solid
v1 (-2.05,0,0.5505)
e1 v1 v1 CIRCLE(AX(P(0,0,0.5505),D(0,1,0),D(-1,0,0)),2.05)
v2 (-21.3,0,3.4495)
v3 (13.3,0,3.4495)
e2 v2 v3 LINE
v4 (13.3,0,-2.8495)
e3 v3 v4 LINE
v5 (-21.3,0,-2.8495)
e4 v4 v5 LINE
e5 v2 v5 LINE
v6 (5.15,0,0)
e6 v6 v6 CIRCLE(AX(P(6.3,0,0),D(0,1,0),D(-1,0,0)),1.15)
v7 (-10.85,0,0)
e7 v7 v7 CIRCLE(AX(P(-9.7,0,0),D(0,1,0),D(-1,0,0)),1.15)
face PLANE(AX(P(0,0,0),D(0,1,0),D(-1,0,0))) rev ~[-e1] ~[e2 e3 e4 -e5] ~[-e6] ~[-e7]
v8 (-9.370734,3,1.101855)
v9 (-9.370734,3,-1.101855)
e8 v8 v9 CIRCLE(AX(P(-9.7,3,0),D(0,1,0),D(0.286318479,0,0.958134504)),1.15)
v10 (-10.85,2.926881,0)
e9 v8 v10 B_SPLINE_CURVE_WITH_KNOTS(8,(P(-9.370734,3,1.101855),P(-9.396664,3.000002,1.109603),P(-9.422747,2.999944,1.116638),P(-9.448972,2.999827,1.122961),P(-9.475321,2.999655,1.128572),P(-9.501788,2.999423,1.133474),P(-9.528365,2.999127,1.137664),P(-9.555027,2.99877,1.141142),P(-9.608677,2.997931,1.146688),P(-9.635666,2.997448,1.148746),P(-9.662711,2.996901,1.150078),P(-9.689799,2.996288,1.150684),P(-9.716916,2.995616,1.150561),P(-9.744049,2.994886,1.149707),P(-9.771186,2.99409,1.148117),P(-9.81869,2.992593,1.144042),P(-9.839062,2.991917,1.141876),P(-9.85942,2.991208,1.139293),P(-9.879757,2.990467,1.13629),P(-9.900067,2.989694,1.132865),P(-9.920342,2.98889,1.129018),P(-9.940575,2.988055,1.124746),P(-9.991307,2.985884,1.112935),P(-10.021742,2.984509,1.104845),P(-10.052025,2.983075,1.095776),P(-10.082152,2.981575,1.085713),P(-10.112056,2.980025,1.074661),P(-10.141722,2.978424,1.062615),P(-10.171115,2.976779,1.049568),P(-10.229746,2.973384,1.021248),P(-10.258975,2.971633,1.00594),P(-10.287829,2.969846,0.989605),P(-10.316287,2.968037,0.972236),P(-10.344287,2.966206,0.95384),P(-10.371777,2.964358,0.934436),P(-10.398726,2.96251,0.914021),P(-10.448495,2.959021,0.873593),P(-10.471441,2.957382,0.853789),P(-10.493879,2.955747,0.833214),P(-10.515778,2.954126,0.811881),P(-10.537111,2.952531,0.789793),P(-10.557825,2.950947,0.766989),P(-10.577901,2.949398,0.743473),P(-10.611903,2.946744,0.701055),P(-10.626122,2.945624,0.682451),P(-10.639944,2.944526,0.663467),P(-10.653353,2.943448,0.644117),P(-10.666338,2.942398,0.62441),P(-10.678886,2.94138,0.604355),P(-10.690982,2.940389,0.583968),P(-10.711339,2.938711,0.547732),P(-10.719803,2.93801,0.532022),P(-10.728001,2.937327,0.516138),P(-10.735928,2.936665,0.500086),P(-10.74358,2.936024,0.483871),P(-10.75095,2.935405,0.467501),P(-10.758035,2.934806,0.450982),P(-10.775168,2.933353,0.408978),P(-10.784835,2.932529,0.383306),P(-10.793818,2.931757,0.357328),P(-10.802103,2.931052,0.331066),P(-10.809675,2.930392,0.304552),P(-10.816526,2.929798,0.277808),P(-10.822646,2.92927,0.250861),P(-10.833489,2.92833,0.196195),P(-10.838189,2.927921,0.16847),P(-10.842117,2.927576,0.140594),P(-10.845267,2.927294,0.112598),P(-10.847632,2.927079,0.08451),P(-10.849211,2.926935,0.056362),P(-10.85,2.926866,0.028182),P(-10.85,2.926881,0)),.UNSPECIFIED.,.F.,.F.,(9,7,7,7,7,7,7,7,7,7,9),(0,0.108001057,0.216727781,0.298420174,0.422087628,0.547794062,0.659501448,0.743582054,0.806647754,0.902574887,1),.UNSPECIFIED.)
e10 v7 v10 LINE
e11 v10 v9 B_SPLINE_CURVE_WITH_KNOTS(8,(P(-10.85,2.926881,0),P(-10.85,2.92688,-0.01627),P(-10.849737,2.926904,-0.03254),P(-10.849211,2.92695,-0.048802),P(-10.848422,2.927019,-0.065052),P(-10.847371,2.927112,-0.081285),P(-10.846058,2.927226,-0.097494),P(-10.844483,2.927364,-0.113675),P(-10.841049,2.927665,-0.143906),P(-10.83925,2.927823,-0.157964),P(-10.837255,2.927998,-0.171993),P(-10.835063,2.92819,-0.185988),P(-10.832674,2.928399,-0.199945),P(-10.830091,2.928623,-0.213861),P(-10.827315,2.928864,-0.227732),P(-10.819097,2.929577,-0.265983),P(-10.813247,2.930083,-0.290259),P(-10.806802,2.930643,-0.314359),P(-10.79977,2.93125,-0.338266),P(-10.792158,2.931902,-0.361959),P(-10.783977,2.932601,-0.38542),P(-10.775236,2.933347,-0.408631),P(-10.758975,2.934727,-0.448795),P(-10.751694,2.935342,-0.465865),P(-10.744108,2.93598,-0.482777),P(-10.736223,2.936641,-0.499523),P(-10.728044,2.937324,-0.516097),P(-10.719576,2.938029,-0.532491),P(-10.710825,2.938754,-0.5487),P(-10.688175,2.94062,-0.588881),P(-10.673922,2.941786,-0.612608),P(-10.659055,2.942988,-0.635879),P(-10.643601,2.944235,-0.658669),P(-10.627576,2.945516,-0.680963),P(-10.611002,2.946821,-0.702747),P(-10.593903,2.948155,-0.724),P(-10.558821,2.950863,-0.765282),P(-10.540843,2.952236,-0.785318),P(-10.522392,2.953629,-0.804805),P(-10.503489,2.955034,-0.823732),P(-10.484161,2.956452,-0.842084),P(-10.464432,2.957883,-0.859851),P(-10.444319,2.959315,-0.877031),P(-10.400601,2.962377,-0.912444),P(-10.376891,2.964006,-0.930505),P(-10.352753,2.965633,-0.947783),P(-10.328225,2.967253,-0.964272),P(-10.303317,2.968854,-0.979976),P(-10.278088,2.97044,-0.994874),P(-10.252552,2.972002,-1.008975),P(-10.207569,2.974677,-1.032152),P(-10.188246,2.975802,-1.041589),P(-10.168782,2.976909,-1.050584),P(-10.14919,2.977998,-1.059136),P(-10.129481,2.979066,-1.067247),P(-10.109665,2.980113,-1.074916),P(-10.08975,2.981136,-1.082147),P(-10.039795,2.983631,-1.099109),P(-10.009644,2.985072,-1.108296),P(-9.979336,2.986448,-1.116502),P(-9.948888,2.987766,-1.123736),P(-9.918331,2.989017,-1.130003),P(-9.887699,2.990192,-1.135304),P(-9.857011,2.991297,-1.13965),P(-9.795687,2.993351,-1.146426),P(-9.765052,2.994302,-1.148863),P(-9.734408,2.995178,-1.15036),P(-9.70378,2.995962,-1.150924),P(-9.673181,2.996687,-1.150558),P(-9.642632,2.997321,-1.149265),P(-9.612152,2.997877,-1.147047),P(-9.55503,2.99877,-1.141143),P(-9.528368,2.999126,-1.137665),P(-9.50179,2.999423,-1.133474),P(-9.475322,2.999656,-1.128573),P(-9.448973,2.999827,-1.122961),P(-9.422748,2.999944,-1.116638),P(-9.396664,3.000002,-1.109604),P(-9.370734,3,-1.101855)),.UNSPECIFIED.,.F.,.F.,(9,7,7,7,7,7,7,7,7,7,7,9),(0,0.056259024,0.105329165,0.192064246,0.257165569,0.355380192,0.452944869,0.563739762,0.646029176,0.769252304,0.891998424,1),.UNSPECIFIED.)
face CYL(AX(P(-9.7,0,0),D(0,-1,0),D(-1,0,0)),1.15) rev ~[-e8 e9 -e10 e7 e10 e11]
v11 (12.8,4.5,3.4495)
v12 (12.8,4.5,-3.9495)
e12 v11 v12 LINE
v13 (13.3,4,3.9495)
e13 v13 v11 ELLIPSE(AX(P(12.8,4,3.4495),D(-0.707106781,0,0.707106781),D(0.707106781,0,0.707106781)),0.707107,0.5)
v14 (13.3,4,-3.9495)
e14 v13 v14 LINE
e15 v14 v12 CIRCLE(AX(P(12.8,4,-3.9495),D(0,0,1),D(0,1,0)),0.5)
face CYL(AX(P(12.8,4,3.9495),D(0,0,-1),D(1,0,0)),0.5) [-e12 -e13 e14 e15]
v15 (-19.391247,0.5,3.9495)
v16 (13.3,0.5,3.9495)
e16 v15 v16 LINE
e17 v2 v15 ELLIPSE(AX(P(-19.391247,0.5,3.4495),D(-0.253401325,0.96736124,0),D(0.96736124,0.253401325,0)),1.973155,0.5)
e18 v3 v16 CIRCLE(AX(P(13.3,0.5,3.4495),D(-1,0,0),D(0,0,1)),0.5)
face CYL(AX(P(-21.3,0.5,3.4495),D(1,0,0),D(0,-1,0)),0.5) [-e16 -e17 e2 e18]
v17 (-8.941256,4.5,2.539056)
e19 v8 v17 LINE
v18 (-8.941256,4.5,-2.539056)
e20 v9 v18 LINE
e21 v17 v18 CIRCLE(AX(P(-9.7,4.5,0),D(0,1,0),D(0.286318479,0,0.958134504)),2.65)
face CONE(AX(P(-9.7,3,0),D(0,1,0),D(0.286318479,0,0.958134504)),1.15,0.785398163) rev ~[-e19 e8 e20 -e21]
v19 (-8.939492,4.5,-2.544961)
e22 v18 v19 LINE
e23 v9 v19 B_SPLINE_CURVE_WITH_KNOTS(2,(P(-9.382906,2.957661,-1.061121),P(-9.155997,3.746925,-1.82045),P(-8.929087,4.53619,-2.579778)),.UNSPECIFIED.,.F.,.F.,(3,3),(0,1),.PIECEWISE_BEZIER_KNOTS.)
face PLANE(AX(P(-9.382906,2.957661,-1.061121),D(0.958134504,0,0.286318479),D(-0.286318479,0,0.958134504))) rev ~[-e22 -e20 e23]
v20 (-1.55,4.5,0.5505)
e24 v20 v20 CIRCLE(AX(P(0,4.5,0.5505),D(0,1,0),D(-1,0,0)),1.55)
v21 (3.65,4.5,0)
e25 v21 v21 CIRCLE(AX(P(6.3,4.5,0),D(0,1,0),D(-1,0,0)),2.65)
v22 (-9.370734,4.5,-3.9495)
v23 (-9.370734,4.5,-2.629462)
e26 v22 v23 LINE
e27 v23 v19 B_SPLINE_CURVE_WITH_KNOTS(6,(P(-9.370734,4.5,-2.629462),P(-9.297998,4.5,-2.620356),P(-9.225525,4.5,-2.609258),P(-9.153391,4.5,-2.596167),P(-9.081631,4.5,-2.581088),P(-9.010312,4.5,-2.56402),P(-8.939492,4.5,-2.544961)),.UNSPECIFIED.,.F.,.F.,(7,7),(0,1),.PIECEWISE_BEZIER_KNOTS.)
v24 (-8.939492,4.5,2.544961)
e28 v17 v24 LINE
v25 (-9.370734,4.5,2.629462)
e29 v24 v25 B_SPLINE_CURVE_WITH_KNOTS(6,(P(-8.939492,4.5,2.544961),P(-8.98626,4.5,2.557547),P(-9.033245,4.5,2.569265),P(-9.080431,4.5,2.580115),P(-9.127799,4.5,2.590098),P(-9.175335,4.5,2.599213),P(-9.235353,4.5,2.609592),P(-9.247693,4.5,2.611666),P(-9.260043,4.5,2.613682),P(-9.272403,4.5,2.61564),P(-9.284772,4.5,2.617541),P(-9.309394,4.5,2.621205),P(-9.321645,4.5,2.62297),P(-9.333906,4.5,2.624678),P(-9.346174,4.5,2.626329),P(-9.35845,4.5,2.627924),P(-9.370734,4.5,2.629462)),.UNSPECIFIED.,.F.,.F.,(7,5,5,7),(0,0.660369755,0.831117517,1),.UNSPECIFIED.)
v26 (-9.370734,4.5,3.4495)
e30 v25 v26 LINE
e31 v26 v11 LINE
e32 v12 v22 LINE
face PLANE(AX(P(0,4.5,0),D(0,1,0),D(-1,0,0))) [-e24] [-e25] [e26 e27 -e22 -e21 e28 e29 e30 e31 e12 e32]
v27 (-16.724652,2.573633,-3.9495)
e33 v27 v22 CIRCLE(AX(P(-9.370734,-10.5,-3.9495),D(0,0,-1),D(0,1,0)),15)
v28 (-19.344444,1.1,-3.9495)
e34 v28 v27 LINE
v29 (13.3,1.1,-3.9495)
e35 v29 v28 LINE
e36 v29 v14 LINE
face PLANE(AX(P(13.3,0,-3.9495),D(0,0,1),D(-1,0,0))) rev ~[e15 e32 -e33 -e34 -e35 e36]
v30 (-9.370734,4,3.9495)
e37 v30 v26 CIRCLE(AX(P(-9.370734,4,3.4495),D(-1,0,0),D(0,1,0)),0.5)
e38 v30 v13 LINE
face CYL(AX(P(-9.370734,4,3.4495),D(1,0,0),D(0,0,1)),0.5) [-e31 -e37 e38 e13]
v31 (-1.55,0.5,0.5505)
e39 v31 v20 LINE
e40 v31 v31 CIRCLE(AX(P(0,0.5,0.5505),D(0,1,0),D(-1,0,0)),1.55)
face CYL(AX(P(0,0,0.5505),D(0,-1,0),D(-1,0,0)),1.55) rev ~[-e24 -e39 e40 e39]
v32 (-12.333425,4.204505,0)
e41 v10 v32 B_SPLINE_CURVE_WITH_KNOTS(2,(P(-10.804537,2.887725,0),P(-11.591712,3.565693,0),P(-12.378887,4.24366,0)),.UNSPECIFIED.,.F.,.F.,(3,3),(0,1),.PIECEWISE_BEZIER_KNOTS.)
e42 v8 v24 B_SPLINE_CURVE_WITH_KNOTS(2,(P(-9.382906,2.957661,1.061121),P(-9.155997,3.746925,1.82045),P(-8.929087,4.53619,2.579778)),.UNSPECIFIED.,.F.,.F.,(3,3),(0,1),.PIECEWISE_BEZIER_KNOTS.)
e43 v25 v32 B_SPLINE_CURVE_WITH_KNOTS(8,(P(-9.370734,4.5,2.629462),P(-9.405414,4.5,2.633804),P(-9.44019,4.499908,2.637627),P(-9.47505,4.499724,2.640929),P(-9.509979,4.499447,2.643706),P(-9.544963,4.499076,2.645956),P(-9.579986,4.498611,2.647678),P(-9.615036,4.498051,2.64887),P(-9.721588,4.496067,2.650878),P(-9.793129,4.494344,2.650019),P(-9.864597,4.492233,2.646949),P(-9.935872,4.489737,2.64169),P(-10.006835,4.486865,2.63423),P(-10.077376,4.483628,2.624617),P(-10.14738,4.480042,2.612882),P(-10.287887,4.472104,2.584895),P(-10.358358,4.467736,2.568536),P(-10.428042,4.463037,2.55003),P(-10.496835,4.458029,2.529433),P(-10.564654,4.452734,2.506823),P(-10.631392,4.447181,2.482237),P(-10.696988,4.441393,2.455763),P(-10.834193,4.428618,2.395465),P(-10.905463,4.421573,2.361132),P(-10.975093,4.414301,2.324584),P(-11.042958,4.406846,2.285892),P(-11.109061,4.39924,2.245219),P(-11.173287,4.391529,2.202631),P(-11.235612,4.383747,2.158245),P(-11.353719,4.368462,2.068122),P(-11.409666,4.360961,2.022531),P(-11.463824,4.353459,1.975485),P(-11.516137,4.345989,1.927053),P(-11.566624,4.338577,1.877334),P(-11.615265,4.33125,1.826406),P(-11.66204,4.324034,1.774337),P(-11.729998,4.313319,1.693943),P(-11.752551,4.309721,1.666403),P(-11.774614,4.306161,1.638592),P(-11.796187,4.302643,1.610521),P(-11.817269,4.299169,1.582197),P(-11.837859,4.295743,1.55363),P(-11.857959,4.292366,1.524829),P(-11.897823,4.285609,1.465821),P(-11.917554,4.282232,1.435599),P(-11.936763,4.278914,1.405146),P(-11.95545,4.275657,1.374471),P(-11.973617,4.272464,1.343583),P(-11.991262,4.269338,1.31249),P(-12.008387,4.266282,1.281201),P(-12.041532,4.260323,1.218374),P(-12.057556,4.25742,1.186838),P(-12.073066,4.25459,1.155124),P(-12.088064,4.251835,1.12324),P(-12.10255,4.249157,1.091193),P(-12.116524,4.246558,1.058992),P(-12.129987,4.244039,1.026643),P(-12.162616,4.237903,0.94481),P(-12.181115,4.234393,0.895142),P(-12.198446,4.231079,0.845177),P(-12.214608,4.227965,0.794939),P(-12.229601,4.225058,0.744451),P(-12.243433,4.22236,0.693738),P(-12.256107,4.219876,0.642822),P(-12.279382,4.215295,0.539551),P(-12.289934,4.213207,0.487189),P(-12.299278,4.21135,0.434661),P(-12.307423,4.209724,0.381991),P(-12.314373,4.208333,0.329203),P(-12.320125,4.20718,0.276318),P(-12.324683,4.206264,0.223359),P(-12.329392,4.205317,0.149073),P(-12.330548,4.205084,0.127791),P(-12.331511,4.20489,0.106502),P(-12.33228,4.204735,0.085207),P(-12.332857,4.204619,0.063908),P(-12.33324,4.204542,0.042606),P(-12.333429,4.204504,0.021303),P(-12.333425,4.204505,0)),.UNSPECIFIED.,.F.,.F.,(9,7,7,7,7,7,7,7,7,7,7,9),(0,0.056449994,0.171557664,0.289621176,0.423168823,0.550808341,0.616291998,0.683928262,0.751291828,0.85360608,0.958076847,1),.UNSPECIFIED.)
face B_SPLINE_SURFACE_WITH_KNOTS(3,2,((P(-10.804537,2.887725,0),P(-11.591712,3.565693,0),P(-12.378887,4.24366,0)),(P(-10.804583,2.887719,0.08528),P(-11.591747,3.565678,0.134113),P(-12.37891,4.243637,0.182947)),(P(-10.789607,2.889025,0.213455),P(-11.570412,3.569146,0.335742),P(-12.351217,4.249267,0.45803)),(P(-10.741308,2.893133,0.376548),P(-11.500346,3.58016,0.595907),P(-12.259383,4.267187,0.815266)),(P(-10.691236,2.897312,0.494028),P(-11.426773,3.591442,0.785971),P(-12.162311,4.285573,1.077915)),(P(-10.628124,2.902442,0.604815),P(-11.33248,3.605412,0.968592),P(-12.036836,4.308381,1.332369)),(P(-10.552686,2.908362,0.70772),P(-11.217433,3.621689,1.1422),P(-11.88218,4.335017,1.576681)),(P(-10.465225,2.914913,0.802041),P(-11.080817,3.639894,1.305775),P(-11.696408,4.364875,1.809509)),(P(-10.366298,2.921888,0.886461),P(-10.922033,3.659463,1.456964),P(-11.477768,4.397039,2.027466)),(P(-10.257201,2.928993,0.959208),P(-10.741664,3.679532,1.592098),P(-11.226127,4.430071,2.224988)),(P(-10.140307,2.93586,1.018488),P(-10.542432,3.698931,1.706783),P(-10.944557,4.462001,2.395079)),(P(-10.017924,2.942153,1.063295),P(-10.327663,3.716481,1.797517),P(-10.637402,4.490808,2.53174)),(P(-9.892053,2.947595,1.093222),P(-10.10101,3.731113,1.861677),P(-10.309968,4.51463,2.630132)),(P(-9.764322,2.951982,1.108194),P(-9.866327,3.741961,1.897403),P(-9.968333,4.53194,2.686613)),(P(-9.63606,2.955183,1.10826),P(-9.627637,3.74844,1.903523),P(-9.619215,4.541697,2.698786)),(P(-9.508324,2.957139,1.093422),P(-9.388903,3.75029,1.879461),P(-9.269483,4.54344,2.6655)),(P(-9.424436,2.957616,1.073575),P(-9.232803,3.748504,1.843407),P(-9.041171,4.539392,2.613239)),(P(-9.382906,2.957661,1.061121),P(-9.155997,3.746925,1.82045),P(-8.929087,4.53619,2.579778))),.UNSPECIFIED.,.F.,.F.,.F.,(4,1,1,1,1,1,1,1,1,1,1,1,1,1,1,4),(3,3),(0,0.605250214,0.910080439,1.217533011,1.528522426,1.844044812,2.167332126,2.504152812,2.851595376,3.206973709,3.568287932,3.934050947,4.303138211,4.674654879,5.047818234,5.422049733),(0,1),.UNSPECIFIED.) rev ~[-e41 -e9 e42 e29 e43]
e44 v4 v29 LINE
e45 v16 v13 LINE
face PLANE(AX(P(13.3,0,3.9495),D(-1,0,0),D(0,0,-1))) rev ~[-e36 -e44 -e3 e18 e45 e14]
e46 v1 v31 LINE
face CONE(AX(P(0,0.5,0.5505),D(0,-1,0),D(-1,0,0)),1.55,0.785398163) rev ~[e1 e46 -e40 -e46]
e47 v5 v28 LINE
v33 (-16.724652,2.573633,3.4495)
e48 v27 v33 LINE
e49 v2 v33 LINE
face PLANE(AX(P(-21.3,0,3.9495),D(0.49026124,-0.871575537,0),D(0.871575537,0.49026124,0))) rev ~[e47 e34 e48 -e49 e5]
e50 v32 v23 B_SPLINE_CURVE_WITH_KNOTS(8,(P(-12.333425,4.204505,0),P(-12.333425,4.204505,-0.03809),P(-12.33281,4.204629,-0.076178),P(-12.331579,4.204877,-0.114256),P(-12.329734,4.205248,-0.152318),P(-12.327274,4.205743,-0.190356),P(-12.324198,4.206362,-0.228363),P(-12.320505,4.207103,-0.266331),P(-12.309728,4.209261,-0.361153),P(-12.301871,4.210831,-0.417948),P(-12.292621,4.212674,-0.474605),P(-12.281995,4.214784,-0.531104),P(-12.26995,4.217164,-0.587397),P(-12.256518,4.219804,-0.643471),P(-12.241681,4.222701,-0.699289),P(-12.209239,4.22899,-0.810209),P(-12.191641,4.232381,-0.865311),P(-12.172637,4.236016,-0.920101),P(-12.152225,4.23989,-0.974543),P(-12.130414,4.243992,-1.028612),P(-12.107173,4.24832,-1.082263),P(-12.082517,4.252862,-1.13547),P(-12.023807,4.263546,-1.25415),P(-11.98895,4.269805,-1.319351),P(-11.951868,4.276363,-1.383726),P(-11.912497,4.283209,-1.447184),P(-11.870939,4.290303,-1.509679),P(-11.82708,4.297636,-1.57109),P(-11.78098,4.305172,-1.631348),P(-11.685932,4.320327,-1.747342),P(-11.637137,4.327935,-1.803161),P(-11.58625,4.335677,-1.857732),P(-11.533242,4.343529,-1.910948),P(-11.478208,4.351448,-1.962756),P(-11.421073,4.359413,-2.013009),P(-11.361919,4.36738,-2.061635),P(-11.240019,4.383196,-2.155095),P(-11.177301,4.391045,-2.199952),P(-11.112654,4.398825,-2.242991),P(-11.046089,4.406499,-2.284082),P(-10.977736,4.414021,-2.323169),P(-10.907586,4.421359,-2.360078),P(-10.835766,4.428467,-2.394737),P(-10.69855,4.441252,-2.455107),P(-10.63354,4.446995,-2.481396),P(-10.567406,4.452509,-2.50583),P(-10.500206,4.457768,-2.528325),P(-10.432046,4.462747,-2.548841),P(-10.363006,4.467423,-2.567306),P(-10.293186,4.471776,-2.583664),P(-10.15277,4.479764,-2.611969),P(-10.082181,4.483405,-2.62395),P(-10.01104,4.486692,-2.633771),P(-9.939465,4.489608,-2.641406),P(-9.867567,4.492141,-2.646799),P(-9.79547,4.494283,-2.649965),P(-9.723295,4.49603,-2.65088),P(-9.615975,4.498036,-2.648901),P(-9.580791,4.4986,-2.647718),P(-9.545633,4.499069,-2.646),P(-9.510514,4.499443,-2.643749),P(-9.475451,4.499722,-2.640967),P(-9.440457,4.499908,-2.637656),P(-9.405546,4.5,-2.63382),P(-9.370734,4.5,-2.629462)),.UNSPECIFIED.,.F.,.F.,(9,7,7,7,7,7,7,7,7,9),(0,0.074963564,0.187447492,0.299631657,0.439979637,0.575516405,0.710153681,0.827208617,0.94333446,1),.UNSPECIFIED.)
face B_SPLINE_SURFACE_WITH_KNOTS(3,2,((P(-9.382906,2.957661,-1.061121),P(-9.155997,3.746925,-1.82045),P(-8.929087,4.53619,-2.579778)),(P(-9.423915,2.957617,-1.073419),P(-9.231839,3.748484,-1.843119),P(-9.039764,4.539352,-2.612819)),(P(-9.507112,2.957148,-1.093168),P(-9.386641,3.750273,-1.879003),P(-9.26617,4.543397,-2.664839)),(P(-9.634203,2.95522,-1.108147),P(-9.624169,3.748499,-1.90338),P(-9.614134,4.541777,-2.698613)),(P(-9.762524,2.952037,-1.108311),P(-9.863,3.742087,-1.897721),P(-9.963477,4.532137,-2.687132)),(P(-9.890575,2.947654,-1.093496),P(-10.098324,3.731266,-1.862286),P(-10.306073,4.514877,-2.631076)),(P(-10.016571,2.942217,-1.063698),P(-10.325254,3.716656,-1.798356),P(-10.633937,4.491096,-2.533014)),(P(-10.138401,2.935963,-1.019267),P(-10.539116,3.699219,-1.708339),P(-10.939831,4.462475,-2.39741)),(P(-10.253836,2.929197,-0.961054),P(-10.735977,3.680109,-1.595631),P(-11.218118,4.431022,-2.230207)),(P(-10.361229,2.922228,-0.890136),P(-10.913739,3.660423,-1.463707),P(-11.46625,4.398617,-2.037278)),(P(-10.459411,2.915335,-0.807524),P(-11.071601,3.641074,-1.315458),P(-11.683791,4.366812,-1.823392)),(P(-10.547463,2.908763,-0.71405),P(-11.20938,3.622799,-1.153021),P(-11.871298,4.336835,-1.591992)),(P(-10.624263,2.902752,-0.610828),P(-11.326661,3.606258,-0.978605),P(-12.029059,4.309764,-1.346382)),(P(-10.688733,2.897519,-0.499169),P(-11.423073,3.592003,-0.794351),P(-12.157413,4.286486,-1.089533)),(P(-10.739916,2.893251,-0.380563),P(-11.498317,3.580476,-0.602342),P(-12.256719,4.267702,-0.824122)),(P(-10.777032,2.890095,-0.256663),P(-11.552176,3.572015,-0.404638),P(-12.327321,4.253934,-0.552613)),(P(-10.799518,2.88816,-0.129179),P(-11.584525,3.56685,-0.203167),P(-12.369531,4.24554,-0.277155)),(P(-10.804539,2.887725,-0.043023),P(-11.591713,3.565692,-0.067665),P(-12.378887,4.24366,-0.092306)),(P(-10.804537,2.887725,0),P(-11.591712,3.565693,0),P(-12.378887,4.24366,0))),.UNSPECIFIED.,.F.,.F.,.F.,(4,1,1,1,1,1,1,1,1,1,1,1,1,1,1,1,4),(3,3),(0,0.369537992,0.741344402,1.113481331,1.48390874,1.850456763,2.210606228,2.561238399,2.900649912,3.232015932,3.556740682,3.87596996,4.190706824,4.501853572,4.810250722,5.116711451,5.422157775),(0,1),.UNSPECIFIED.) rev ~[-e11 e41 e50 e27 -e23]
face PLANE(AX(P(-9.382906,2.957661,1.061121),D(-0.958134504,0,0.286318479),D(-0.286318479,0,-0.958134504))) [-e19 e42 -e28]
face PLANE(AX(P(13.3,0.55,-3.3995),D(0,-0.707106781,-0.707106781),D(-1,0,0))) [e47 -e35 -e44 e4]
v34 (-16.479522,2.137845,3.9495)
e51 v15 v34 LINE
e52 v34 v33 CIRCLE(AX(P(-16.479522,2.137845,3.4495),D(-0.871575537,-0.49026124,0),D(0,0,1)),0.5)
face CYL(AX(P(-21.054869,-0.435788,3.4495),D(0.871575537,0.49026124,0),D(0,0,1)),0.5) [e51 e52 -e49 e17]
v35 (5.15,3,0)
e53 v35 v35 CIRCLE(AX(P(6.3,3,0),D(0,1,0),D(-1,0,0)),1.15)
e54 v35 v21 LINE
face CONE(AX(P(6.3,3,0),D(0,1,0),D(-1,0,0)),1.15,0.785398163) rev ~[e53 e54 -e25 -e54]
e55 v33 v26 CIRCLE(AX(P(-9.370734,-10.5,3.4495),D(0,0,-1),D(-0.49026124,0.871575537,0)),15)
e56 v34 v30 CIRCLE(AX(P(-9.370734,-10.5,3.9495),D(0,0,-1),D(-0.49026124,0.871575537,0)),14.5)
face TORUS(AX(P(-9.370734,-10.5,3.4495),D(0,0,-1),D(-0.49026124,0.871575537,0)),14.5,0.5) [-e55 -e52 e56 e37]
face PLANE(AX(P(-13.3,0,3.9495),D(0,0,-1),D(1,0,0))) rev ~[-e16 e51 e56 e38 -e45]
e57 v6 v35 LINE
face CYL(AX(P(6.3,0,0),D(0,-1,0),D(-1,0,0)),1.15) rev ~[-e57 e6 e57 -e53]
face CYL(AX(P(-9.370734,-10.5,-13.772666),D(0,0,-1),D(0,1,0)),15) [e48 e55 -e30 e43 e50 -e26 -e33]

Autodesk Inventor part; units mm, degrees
ref_plane "YZ Plane" through (0, 0, 0) normal (1, 0, 0) x (0, 1, 0)
ref_plane "XZ Plane" through (0, 0, 0) normal (0, 1, 0) x (-1, 0, 0)
ref_plane "XY Plane" through (0, 0, 0) normal (0, 0, 1) x (1, 0, 0)
sketch "Эскиз1" plane through (0, 0, 0) normal (0, 1, 0) x (-1, 0, 0)
  line L0 (-13.3, -3.9495) -> (13.3, -3.9495)
  line L1 (13.3, -3.9495) -> (13.3, 3.9495)
  line L2 (13.3, 3.9495) -> (-13.3, 3.9495)
  line L3 (-13.3, 3.9495) -> (-13.3, -3.9495)
  line L4 (-13.3, -3.9495) -> (13.3, 3.9495) construction
  line L5 (13.3, -3.9495) -> (-13.3, 3.9495) construction
  line L6 (0, 3.9495) -> (0, -3.9495) construction
  circle A0 centre (0, 0.5505) radius 1.55
  circle A1 centre (-6.3, 0) radius 1.15
  circle A2 centre (9.7, 0) radius 1.15
  point P0 (0, 0)
  dimension "d0" = 13.3
  dimension "d1" = 7.899
  dimension "d2" = 3.1
  dimension "d3" = 4.5
  dimension "d35" = 2.3
  dimension "d36" = 2.3
  dimension "d37" = 7
  dimension "d38" = 16
  dimension "d39" = 3.9495
  dimension "d40" = 3.9495
extrude "Выдавливание1" add sketch "Эскиз1" along normal blind 4.5
sketch "Эскиз4" plane through (-13.3, 0, 3.9495) normal (0, 0, 1) x (1, 0, 0)
  line L0 (0, 0) -> (0, 4.5) projected
  line L1 (0, 0) -> (-8, 0)
  line L2 (0, 4.5) -> (26.6, 4.5) projected
  line L3 (-8, 0) -> (0, 4.5)
  point P0 (13.3, 0)
  point P1 (25.6, 4.5)
  point P2 (3.9103, 4.5)
  dimension "d19" = 8
extrude "Выдавливание4" add sketch "Эскиз4" against normal blind 7.899
fillet "Сопряжение4" radius 15 1 edges at (-13.3, 4.5, 0)
chamfer "Фаска2" distance 0.5 angle 45 1 edges at (1.55, 0, 0.5505)
chamfer "Фаска3" distance 1.1 angle 45 1 edges at (-4, 0, -3.9495)
fillet "Сопряжение7" radius 0.5 5 edges at (-4, 0, 3.9495) (-19.0123, 1.2868, 3.9495) (-13.1718, 4.0104, 3.9495) (1.9646, 4.5, 3.9495) (13.3, 4.5, 0)
chamfer "Фаска4" distance 1.5 angle 45 4 edges at (-8.55, 4.5, 0) (-10.4551, 4.4608, -0.8673) (-10.4603, 4.4604, 0.8628) (7.45, 4.5, 0)
equation "\"d39\" = 0.5 * d1"
equation "\"d40\" = d39"
properties part number "derz_LED"
